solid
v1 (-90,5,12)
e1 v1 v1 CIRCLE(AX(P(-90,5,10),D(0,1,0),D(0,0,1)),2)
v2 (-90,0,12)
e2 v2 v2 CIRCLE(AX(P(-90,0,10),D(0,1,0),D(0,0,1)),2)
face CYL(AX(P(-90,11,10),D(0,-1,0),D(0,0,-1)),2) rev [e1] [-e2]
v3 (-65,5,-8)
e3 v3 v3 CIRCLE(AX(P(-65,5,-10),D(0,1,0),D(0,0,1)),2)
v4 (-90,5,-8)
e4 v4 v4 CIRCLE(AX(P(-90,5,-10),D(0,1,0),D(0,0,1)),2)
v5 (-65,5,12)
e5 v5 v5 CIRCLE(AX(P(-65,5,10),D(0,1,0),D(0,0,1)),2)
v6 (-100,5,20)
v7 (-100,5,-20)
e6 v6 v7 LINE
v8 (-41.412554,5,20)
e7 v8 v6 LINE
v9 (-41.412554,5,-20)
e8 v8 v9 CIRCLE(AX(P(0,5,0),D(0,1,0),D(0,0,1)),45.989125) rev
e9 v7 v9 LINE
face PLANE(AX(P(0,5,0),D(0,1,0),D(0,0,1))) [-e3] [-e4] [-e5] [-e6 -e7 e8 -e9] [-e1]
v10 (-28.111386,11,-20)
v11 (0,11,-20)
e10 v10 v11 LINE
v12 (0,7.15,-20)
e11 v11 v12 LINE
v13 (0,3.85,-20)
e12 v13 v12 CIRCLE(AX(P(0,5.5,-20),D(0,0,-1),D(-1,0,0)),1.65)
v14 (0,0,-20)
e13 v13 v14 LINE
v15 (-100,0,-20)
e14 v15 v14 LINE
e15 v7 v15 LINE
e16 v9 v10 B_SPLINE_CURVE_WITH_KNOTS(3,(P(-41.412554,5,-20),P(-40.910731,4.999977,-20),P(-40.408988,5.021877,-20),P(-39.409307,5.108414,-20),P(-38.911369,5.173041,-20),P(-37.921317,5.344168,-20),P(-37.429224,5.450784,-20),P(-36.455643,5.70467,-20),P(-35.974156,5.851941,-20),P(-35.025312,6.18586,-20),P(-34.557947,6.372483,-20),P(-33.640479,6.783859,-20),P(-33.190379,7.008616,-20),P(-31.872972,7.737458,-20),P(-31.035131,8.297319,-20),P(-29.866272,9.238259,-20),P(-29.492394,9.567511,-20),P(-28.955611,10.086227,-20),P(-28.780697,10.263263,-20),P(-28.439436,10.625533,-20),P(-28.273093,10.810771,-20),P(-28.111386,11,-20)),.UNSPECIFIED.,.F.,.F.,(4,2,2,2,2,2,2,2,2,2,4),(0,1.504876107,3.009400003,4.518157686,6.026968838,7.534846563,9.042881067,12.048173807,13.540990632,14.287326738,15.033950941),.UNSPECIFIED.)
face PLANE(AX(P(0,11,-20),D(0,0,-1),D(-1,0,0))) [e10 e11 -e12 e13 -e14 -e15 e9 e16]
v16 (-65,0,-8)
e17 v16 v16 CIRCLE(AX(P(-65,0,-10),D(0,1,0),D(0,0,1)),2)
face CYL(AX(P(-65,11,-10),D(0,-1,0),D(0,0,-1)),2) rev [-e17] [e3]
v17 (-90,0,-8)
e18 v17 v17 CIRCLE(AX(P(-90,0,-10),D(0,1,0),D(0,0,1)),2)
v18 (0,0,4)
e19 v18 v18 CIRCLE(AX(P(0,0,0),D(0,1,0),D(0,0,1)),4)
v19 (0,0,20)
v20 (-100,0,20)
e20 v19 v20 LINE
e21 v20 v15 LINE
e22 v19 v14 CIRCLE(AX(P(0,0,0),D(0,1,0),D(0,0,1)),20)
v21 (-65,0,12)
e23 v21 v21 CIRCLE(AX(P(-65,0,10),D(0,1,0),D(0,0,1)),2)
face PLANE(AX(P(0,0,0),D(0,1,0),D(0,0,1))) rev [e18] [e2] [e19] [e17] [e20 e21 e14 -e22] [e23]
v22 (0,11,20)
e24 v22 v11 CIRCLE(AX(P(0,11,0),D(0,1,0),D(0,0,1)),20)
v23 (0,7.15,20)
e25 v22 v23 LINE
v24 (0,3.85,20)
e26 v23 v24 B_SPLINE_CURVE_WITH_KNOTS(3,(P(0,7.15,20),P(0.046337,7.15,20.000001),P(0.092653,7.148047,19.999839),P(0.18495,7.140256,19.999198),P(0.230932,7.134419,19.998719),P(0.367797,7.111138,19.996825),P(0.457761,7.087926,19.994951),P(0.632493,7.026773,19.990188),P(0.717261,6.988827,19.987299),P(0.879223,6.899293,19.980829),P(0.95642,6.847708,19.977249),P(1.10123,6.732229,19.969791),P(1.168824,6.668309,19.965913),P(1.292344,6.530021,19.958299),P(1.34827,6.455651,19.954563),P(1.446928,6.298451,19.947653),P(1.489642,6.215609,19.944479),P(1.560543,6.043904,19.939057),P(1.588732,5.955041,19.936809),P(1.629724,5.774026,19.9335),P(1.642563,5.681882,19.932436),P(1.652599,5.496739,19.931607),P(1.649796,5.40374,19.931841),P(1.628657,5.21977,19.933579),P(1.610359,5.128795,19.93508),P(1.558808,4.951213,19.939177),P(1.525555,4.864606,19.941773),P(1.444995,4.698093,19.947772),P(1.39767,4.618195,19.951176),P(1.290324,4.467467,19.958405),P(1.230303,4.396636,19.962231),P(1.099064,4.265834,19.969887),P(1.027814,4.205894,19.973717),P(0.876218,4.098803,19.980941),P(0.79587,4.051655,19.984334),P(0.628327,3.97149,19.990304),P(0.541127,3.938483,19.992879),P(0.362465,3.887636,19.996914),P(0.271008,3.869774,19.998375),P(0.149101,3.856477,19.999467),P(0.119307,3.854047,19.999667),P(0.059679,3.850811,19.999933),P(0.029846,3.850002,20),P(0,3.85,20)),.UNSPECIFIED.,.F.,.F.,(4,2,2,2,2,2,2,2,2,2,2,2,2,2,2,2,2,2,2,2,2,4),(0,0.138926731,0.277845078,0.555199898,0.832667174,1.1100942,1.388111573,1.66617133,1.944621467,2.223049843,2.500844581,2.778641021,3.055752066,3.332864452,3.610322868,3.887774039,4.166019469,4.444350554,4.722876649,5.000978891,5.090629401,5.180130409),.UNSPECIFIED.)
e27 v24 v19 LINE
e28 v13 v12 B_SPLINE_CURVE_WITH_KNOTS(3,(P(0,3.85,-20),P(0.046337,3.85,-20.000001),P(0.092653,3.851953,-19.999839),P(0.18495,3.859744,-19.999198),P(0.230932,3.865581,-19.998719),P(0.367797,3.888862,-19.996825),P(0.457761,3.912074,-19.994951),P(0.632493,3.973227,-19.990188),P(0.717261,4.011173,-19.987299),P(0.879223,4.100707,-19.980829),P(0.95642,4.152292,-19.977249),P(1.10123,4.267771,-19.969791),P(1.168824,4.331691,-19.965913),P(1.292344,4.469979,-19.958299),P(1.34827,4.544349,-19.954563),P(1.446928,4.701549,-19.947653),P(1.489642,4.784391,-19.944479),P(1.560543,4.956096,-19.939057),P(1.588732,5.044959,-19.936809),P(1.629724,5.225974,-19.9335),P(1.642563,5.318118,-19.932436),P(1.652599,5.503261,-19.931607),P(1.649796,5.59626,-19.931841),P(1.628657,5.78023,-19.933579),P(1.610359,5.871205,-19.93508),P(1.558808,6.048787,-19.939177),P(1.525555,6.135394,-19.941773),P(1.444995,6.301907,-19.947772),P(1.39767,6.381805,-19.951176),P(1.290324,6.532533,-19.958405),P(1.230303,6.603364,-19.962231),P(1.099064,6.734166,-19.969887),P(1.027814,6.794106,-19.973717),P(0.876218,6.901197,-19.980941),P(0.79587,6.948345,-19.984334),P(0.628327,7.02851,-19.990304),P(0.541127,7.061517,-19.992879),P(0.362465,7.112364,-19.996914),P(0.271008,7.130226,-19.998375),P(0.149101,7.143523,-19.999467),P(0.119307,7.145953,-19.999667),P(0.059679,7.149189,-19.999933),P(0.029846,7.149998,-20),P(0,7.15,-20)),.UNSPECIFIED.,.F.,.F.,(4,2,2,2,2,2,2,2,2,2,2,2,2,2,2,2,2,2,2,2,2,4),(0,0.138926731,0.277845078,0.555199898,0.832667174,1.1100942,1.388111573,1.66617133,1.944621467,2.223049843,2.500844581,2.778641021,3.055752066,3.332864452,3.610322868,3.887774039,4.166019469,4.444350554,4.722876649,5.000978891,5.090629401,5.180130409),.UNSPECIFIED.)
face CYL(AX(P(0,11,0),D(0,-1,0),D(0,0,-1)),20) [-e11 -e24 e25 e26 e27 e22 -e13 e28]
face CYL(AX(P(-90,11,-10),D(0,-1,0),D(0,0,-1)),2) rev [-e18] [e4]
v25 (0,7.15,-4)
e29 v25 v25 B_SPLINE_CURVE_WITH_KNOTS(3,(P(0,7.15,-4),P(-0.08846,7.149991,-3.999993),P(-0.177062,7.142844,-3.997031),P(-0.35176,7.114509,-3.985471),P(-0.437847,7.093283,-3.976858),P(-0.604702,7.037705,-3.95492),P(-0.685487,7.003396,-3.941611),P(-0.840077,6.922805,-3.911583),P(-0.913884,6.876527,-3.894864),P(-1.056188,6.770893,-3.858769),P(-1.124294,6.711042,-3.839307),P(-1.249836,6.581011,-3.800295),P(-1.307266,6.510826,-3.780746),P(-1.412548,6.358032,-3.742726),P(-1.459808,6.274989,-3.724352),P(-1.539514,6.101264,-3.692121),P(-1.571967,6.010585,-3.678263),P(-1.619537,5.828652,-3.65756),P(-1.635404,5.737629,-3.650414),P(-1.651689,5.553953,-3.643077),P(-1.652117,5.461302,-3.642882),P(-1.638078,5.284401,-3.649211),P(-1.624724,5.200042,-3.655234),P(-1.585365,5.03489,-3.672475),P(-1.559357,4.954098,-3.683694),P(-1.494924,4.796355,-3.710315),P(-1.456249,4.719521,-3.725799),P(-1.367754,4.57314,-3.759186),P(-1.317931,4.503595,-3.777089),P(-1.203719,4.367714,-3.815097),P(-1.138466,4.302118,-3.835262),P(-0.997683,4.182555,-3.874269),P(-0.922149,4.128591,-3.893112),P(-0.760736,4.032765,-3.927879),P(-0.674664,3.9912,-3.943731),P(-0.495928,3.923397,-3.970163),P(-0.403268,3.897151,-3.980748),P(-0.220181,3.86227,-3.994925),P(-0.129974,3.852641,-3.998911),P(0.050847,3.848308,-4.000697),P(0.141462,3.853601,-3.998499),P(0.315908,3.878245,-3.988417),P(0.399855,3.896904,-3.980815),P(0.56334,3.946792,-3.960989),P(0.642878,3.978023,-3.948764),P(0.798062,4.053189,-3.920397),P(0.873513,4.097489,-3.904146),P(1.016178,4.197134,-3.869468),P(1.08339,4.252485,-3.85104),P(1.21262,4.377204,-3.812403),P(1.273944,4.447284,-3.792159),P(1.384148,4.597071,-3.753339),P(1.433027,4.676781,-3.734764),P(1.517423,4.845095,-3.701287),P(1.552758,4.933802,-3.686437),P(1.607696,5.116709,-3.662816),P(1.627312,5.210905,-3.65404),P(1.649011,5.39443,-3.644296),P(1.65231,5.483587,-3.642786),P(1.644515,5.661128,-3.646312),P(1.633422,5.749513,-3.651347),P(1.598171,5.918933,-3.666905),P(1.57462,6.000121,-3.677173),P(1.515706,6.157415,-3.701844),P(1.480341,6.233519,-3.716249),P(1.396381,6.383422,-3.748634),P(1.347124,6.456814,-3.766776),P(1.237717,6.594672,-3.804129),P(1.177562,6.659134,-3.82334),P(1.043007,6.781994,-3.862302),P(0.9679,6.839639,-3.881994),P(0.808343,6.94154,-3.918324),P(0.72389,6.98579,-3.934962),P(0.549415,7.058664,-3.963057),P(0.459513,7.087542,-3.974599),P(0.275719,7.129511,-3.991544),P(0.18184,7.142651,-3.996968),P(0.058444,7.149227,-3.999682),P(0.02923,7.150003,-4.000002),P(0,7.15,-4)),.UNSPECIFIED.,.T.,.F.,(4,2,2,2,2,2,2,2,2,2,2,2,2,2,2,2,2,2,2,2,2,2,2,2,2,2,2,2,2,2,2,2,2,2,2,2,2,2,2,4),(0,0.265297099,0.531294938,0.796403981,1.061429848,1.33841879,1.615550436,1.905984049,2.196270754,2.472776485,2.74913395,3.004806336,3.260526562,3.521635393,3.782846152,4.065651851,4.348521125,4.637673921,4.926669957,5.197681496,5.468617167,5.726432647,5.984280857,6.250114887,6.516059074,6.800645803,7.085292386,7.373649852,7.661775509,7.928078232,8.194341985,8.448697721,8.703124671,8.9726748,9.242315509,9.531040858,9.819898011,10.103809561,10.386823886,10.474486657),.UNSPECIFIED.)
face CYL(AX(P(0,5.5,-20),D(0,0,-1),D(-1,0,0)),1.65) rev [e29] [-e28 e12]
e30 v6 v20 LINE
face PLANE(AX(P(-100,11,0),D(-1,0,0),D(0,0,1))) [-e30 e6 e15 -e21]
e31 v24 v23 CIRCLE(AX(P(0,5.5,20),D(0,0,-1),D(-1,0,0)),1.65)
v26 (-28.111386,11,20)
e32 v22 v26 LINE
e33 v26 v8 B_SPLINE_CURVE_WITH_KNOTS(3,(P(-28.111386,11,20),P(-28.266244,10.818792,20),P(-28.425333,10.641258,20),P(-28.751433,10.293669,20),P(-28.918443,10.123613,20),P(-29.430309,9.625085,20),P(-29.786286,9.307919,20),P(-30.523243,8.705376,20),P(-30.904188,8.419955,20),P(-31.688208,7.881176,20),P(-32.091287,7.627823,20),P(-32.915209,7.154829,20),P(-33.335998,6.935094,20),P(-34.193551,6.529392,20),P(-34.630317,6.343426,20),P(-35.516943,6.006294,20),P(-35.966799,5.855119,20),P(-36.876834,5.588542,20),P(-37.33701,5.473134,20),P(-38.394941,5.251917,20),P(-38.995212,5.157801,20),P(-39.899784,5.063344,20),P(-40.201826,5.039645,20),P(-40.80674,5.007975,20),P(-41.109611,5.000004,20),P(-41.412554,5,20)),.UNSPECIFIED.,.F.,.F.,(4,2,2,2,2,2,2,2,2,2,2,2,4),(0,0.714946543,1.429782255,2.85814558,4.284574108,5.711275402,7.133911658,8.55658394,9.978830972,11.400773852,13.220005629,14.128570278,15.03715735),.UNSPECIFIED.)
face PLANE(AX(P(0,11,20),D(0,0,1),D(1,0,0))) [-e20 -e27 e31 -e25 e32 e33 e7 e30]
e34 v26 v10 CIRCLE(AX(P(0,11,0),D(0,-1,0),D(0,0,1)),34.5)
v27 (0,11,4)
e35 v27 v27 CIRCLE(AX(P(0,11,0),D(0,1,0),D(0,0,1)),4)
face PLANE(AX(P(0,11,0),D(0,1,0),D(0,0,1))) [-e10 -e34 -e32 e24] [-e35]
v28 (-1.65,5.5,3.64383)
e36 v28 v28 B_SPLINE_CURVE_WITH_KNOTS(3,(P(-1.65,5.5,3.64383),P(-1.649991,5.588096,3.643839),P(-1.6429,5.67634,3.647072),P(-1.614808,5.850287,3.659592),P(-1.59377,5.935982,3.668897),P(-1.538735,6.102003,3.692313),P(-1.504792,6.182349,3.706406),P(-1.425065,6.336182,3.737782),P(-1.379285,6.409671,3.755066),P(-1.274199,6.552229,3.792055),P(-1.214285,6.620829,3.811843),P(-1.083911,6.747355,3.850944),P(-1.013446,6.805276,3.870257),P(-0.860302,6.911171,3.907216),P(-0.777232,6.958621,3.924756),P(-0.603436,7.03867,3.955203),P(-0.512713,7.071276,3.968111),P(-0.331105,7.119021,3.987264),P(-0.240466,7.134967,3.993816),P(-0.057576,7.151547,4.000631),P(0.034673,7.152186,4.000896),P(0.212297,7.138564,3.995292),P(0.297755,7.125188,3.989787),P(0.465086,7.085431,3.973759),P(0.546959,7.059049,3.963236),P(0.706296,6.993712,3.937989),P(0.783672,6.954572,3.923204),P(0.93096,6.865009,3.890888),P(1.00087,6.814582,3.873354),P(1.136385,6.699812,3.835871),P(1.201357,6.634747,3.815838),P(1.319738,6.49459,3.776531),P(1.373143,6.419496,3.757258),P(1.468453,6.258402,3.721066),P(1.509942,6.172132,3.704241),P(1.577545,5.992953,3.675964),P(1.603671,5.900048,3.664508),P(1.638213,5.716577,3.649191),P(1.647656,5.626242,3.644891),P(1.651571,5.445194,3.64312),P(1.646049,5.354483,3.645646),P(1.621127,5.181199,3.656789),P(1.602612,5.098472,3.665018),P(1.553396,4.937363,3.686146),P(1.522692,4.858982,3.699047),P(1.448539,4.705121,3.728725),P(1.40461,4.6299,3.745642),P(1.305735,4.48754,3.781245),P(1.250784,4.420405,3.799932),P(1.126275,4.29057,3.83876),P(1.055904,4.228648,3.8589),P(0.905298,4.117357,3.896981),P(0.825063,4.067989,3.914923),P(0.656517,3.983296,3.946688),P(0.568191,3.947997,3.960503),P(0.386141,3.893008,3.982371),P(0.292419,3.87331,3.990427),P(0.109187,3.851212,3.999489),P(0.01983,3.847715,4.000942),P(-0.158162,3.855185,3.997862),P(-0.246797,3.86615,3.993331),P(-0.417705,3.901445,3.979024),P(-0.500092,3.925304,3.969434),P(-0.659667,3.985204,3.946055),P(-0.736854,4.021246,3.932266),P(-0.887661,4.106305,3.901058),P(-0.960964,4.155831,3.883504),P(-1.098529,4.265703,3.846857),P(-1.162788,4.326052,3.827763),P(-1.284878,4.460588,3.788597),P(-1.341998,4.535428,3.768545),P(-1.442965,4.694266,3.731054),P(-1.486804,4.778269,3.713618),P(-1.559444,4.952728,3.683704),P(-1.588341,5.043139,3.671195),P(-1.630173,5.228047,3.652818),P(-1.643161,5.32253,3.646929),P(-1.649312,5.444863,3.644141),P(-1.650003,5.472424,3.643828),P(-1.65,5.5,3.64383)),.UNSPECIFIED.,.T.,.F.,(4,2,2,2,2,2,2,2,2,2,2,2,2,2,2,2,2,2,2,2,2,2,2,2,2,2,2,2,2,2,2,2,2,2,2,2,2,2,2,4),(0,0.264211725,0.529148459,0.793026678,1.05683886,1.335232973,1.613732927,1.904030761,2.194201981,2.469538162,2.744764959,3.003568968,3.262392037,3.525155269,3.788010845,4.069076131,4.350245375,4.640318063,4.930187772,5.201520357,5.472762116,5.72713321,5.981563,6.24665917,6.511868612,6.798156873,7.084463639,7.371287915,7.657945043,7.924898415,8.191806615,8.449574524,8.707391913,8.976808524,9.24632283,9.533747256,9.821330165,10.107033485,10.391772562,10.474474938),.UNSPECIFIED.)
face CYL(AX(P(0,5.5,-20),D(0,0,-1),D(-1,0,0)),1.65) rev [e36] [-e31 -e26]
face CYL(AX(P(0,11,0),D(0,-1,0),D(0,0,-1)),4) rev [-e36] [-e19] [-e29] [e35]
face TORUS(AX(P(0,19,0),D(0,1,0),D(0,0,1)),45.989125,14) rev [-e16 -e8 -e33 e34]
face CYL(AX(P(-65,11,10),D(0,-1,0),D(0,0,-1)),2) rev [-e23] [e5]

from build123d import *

# Parameters (mm, degrees)
SKETCH1_R           = 2
SKETCH1_R_2         = 4
BOSS_EXTRUDE1_DEPTH = 11
CUT_EXTRUDE1_DEPTH  = 6
FILLET2_R           = 14
M4_TAPPED_HOLE1_D   = 3.3


with BuildPart() as part:
    # Sketch1 → Boss-Extrude1 (new body)
    with BuildSketch(Plane(origin=(0, 0, 0), x_dir=(1, 0, 0), z_dir=(0, 1, 0))):
        with BuildLine():
            Line((0, 20), (-100, 20))
            Line((-100, 20), (-100, -5))
            Line((-100, -5), (-100, -20))
            Line((-100, -20), (0, -20))
            ThreePointArc((0, -20), (14.142135607, -14.14213564), (20, -4.7e-08))
            ThreePointArc((20, -4.7e-08), (14.14213564, 14.142135607), (0, 20))
        make_face()
        with Locations(Location((-90, -10, 0), (0, 0, 270))):
            Circle(SKETCH1_R, mode=Mode.SUBTRACT)
        with Locations(Location((-65, -10, 0), (0, 0, 270))):
            Circle(SKETCH1_R, mode=Mode.SUBTRACT)
        with Locations(Location((-90, 10, 0), (0, 0, 270))):
            Circle(SKETCH1_R, mode=Mode.SUBTRACT)
        with Locations(Location((-65, 10, 0), (0, 0, 270))):
            Circle(SKETCH1_R, mode=Mode.SUBTRACT)
        with Locations(Location((0, 0, 0), (0, 0, 270))):
            Circle(SKETCH1_R_2, mode=Mode.SUBTRACT)
    extrude(amount=BOSS_EXTRUDE1_DEPTH)

    # Sketch4 → Cut-Extrude1 (cut)
    with BuildSketch(Plane(origin=(0, 11, 0), x_dir=(1, 0, 0), z_dir=(0, 1, 0))):
        with BuildLine():
            Line((-28.111385594, 20), (-100, 20))
            Line((-100, 20), (-100, -20))
            Line((-100, -20), (-28.111385594, -20))
            ThreePointArc((-28.111385594, -20), (-34.5, 0), (-28.111385594, 20))
        make_face()
    extrude(amount=-CUT_EXTRUDE1_DEPTH, mode=Mode.SUBTRACT)

    # Fillet2
    # the kernel refuses this fillet: 14 mm, written as the material it adds along each edge
    with BuildSketch(Plane(origin=(0, 5, 0), x_dir=(-0.1193853688936188, 0, 0.9928479912323611), z_dir=(0.9928479912323611, 0, 0.1193853688936188))) as fillet2_piece_1_section:
        with BuildLine():
            CenterArc((45.989125293, -14), FILLET2_R, 90, 55.150095421)
            Line((34.5, -6), (34.270217494, -5.84))
            ThreePointArc((34.270217494, -5.84), (34.22, -3), (34.22, 0))
            Line((34.22, 0), (34.5, 0.28))
            Line((34.5, 0.28), (45.989125293, 0.28))
            Line((45.989125293, 0.28), (45.989125293, 0))
        make_face()
    fillet2_piece_1 = revolve(axis=Axis((0, 5, 0), (0, -1, 0)), revolution_arc=166.286736379, mode=Mode.PRIVATE)
    fillet2_piece_1 = split(fillet2_piece_1, bisect_by=Plane(origin=(-35.442796837, 6.550585525, -20), z_dir=(0, 0, 1)), keep=Keep.TOP, mode=Mode.PRIVATE)
    fillet2_piece_1 = split(fillet2_piece_1, bisect_by=Plane(origin=(-35.442796837, 6.550585525, 20), z_dir=(0, 0, -1)), keep=Keep.TOP, mode=Mode.PRIVATE)
    add(fillet2_piece_1)

    # M4 Tapped Hole1 (through all)
    with Locations(Plane(origin=(0, 0, -20), x_dir=(-1, 0, 0), z_dir=(0, 0, -1))):
        with Locations((0, 5.5)):
            Hole(M4_TAPPED_HOLE1_D / 2)


solid = part.part
